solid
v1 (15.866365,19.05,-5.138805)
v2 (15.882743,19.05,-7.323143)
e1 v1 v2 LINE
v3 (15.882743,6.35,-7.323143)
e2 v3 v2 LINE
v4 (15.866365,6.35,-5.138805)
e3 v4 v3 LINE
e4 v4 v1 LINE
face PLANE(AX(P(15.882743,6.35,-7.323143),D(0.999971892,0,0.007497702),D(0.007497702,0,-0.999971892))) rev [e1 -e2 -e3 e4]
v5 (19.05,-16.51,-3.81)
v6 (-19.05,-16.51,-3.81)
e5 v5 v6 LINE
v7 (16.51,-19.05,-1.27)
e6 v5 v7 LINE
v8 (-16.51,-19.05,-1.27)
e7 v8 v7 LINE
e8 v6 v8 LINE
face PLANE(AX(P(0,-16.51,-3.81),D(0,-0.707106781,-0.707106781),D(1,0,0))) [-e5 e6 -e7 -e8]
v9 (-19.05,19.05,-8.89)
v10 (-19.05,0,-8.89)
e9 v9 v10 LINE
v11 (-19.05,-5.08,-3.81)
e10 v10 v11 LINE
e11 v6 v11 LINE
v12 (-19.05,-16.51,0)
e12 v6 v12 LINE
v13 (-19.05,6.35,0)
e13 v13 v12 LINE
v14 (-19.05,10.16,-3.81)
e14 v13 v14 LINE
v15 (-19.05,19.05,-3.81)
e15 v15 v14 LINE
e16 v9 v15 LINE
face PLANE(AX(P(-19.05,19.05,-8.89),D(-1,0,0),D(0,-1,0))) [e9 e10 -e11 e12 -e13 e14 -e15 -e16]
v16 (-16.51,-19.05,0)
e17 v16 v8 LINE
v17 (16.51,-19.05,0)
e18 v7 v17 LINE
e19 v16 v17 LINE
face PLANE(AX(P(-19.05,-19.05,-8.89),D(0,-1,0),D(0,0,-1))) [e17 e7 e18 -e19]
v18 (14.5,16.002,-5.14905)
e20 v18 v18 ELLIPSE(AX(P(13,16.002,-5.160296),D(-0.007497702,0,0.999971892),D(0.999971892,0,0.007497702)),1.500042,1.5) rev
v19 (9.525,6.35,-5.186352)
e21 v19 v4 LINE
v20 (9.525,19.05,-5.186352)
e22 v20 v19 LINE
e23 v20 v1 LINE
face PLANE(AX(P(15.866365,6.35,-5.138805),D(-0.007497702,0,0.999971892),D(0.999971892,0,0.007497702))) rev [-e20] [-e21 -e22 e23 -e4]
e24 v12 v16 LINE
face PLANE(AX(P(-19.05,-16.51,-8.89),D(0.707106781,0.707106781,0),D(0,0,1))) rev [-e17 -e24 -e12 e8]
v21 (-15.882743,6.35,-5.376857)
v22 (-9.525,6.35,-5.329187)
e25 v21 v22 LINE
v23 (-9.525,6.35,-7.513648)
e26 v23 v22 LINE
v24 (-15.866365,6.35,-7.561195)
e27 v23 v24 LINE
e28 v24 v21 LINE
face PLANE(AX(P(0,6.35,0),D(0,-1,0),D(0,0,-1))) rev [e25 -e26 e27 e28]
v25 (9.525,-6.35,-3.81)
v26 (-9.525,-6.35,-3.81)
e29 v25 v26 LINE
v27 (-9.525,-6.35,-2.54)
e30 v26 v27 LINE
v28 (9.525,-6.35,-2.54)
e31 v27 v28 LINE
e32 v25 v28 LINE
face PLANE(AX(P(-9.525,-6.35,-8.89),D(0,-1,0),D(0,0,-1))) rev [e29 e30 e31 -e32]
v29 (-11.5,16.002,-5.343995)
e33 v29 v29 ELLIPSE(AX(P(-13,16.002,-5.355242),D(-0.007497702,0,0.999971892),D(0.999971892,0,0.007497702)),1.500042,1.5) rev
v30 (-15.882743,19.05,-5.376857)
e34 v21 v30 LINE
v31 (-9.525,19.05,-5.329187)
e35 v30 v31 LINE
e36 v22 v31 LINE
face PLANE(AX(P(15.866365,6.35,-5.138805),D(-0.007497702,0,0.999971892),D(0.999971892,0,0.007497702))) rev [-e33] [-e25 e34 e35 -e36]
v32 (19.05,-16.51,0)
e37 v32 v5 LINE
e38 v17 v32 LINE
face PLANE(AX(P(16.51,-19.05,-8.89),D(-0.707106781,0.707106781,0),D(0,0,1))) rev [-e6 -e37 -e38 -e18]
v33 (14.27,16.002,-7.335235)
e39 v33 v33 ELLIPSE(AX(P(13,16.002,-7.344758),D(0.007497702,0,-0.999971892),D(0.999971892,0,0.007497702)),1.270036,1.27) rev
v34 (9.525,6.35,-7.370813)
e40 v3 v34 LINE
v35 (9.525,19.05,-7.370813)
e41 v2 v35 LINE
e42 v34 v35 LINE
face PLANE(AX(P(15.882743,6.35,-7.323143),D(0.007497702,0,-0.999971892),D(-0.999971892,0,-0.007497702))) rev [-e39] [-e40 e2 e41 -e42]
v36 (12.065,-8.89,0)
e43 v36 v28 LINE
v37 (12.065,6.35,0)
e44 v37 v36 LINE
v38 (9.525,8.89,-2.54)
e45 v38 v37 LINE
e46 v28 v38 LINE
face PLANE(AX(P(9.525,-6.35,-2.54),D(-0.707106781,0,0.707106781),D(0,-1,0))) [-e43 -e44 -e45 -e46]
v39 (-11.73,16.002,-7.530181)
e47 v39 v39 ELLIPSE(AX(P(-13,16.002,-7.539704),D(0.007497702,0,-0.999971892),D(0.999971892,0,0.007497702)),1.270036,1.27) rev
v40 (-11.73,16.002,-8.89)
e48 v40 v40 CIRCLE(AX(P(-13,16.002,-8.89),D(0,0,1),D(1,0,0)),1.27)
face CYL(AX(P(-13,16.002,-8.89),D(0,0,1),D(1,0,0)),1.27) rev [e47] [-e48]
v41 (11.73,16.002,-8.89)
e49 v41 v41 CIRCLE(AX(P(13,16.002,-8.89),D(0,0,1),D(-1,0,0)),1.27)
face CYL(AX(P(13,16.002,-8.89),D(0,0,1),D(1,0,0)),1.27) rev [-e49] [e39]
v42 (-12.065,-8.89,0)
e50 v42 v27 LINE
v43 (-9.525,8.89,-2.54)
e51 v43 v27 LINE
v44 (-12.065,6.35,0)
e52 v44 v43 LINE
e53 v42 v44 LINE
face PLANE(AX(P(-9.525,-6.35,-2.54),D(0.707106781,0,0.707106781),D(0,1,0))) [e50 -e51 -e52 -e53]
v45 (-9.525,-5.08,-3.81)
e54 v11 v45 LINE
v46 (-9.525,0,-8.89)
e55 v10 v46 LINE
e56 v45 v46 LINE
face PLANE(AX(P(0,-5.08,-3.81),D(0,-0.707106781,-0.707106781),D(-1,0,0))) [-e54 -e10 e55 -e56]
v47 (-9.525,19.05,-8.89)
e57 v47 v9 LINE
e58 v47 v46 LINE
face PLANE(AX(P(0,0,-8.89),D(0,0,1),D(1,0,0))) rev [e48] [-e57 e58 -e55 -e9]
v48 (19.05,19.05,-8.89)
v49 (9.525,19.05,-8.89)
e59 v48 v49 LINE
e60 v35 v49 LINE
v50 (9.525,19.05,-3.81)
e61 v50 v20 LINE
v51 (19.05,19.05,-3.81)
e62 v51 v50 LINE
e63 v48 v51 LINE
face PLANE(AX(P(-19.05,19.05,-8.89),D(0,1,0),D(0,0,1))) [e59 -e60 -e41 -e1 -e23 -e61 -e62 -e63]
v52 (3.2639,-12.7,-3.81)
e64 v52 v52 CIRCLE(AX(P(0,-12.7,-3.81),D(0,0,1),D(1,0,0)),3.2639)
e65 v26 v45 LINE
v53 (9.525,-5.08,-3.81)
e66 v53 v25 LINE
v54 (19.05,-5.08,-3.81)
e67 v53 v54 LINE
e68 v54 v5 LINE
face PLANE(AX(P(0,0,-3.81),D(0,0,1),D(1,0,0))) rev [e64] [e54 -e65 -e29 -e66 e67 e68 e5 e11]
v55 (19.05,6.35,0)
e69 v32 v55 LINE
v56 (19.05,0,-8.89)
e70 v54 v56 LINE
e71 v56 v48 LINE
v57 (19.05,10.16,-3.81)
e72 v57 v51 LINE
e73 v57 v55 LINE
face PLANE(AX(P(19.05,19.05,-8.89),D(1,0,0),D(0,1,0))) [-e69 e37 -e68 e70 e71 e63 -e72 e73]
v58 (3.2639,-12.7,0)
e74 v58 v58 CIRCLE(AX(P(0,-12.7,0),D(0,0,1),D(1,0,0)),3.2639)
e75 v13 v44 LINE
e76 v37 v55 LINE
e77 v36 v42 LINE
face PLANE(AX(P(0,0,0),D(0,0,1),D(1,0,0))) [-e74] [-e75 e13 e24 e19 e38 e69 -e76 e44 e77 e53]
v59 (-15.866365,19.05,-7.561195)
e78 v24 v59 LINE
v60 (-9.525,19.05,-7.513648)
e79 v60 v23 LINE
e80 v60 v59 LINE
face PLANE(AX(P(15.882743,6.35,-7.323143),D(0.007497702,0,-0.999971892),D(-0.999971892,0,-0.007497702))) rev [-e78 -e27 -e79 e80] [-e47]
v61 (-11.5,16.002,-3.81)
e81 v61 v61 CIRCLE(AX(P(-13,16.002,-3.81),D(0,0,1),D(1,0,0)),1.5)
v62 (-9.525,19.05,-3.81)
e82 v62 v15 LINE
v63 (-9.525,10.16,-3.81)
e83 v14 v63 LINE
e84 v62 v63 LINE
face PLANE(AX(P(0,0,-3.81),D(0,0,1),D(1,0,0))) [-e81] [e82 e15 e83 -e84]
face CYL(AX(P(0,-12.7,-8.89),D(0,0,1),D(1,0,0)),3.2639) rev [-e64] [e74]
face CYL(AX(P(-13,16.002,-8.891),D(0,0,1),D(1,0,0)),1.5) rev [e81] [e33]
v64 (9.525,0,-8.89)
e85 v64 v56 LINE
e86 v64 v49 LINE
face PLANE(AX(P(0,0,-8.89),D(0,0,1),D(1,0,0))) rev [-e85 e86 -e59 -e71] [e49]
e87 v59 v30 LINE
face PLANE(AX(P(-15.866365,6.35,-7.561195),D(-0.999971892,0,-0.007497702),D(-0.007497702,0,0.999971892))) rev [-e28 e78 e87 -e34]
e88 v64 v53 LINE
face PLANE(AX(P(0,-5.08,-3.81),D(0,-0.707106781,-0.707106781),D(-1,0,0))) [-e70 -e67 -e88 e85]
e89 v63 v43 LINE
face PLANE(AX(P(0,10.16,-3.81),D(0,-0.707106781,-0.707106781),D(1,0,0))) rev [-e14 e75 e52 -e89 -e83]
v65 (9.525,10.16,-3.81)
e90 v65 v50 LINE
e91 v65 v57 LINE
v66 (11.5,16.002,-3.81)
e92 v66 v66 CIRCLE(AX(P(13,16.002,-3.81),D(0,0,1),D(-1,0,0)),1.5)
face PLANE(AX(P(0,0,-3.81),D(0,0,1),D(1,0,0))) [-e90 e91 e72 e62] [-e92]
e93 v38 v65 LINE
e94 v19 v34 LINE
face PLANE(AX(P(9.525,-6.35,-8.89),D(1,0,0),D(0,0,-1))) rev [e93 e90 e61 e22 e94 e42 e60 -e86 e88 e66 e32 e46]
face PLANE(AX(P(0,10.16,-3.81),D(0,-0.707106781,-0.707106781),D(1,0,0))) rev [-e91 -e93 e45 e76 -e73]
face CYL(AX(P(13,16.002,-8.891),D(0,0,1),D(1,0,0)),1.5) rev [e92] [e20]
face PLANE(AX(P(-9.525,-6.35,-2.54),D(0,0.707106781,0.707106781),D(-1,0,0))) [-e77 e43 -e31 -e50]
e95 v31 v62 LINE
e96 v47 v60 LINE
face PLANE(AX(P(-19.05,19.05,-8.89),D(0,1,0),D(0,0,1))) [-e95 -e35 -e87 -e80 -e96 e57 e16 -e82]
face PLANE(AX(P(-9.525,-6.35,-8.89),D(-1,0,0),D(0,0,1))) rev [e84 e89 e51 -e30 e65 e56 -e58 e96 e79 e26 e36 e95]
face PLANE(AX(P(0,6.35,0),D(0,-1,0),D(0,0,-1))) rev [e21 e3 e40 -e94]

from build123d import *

# Parameters (mm, degrees)
SKETCH1_W           = 38.1
SKETCH1_H           = 38.1
BOSS_EXTRUDE1_DEPTH = 8.89
SKETCH3_W           = 38.1
SKETCH3_H           = 12.7
CUT_EXTRUDE1_DEPTH  = 3.81
SKETCH4_R           = 1.27
CUT_EXTRUDE2_DEPTH  = 28.415532094
SKETCH6_W           = 19.05
SKETCH6_H           = 31.75
CUT_EXTRUDE5_DEPTH  = 29.369651038
CUT_EXTRUDE6_DEPTH  = 12.7
SKETCH8_W           = 38.1
SKETCH8_H           = 19.05
CUT_EXTRUDE7_DEPTH  = 5.08
SKETCH9_R           = 3.2639
CUT_EXTRUDE8_DEPTH  = 29.369651038
CUT_EXTRUDE9_REACH  = 29.416
SKETCH10_R          = 1.5
CHAMFER6_SIZE       = 5.08
CHAMFER7_SIZE       = 3.81
CHAMFER8_SIZE       = 2.54
CHAMFER9_SIZE       = 2.54


with BuildPart() as part:
    # Sketch1 → Boss-Extrude1 (new body)
    with BuildSketch(Plane.XY):
        Rectangle(SKETCH1_W, SKETCH1_H)
    extrude(amount=-BOSS_EXTRUDE1_DEPTH)

    # Sketch3 → Cut-Extrude1 (cut)
    with BuildSketch(Plane.XY):
        with Locations((0, 12.7)):
            Rectangle(SKETCH3_W, SKETCH3_H)
    extrude(amount=-CUT_EXTRUDE1_DEPTH, mode=Mode.SUBTRACT)

    # Sketch4 → Cut-Extrude2 (cut, through all)
    with BuildSketch(Plane.XY.offset(-3.81)):
        with Locations((-13, 16.002)):
            Circle(SKETCH4_R)
        with Locations(Location((13, 16.002, 0), (0, 0, 180))):
            Circle(SKETCH4_R)
    extrude(amount=-CUT_EXTRUDE2_DEPTH, mode=Mode.SUBTRACT)

    # Sketch6 → Cut-Extrude5 (cut, through all)
    with BuildSketch(Plane.XY):
        with Locations((0, 9.525)):
            Rectangle(SKETCH6_W, SKETCH6_H)
    extrude(amount=-CUT_EXTRUDE5_DEPTH, mode=Mode.SUBTRACT)

    # Sketch7 → Cut-Extrude6 (cut)
    with BuildSketch(Plane(origin=(0, 19.05, 0), x_dir=(1, 0, 0), z_dir=(0, 1, 0))):
        Polygon((15.882742773, 7.323143279), (-15.866364793, 7.561195322), (-15.882742773, 5.376856721), (15.866364793, 5.138804678), align=None)
    extrude(amount=-CUT_EXTRUDE6_DEPTH, mode=Mode.SUBTRACT)

    # Sketch8 → Cut-Extrude7 (cut)
    with BuildSketch(Plane(origin=(0, 0, -8.89), x_dir=(-1, 0, 0), z_dir=(0, 0, -1))):
        with Locations((0, -9.525)):
            Rectangle(SKETCH8_W, SKETCH8_H)
    extrude(amount=-CUT_EXTRUDE7_DEPTH, mode=Mode.SUBTRACT)

    # Sketch9 → Cut-Extrude8 (cut, through all)
    with BuildSketch(Plane.XY):
        with Locations((0, -12.7)):
            Circle(SKETCH9_R)
    extrude(amount=-CUT_EXTRUDE8_DEPTH, mode=Mode.SUBTRACT)

    # Cut-Extrude9: up to this plane
    cut_extrude9_end = Plane(origin=(15.866364793, 6.35, -5.138804678), z_dir=(-0.007497702129822743, 0, 0.9999718918363518))
    # Sketch10 → Cut-Extrude9 (cut, up to the surface)
    with BuildSketch(Plane.XY.offset(-3.81), mode=Mode.PRIVATE) as cut_extrude9_sk1:
        with Locations((-13, 16.002)):
            Circle(SKETCH10_R)
    cut_extrude9_tool1 = split(extrude(cut_extrude9_sk1.sketch, amount=-CUT_EXTRUDE9_REACH, mode=Mode.PRIVATE), bisect_by=cut_extrude9_end, keep=Keep.BOTH, mode=Mode.PRIVATE)
    add(cut_extrude9_tool1.solids().sort_by_distance((-13, 16.002, -3.81))[0], mode=Mode.SUBTRACT)
    # Sketch10 → Cut-Extrude9 (cut, up to the surface)
    with BuildSketch(Plane.XY.offset(-3.81), mode=Mode.PRIVATE) as cut_extrude9_sk2:
        with Locations((13, 16.002)):
            Circle(SKETCH10_R)
    cut_extrude9_tool2 = split(extrude(cut_extrude9_sk2.sketch, amount=-CUT_EXTRUDE9_REACH, mode=Mode.PRIVATE), bisect_by=cut_extrude9_end, keep=Keep.BOTH, mode=Mode.PRIVATE)
    add(cut_extrude9_tool2.solids().sort_by_distance((13, 16.002, -3.81))[0], mode=Mode.SUBTRACT)

    # Chamfer6
    chamfer6_edges = [part.edges().sort_by_distance(p)[0] for p in [
        (-14.2875, 0, -3.81),
        (14.2875, 0, -3.81),
    ]]
    chamfer(chamfer6_edges, length=CHAMFER6_SIZE - 0.0001)  # a hair under: the kernel refuses the full size

    # Chamfer7
    chamfer7_edges = [part.edges().sort_by_distance(p)[0] for p in [
        (-14.2875, 6.35, -3.81),
        (14.2875, 6.35, -3.81),
    ]]
    chamfer(chamfer7_edges, length=CHAMFER7_SIZE - 0.0001)  # a hair under: the kernel refuses the full size

    # Chamfer8
    chamfer8_edges = [part.edges().sort_by_distance(p)[0] for p in [
        (-9.525, 0, 0),
        (0, -6.35, 0),
        (9.525, 0, 0),
    ]]
    chamfer(chamfer8_edges, length=CHAMFER8_SIZE)

    # Chamfer9
    chamfer9_edges = [part.edges().sort_by_distance(p)[0] for p in [
        (-19.05, -19.05, -1.905),
        (19.05, -19.05, -1.905),
        (0, -19.05, -3.81),
    ]]
    chamfer(chamfer9_edges, length=CHAMFER9_SIZE)


solid = part.part
